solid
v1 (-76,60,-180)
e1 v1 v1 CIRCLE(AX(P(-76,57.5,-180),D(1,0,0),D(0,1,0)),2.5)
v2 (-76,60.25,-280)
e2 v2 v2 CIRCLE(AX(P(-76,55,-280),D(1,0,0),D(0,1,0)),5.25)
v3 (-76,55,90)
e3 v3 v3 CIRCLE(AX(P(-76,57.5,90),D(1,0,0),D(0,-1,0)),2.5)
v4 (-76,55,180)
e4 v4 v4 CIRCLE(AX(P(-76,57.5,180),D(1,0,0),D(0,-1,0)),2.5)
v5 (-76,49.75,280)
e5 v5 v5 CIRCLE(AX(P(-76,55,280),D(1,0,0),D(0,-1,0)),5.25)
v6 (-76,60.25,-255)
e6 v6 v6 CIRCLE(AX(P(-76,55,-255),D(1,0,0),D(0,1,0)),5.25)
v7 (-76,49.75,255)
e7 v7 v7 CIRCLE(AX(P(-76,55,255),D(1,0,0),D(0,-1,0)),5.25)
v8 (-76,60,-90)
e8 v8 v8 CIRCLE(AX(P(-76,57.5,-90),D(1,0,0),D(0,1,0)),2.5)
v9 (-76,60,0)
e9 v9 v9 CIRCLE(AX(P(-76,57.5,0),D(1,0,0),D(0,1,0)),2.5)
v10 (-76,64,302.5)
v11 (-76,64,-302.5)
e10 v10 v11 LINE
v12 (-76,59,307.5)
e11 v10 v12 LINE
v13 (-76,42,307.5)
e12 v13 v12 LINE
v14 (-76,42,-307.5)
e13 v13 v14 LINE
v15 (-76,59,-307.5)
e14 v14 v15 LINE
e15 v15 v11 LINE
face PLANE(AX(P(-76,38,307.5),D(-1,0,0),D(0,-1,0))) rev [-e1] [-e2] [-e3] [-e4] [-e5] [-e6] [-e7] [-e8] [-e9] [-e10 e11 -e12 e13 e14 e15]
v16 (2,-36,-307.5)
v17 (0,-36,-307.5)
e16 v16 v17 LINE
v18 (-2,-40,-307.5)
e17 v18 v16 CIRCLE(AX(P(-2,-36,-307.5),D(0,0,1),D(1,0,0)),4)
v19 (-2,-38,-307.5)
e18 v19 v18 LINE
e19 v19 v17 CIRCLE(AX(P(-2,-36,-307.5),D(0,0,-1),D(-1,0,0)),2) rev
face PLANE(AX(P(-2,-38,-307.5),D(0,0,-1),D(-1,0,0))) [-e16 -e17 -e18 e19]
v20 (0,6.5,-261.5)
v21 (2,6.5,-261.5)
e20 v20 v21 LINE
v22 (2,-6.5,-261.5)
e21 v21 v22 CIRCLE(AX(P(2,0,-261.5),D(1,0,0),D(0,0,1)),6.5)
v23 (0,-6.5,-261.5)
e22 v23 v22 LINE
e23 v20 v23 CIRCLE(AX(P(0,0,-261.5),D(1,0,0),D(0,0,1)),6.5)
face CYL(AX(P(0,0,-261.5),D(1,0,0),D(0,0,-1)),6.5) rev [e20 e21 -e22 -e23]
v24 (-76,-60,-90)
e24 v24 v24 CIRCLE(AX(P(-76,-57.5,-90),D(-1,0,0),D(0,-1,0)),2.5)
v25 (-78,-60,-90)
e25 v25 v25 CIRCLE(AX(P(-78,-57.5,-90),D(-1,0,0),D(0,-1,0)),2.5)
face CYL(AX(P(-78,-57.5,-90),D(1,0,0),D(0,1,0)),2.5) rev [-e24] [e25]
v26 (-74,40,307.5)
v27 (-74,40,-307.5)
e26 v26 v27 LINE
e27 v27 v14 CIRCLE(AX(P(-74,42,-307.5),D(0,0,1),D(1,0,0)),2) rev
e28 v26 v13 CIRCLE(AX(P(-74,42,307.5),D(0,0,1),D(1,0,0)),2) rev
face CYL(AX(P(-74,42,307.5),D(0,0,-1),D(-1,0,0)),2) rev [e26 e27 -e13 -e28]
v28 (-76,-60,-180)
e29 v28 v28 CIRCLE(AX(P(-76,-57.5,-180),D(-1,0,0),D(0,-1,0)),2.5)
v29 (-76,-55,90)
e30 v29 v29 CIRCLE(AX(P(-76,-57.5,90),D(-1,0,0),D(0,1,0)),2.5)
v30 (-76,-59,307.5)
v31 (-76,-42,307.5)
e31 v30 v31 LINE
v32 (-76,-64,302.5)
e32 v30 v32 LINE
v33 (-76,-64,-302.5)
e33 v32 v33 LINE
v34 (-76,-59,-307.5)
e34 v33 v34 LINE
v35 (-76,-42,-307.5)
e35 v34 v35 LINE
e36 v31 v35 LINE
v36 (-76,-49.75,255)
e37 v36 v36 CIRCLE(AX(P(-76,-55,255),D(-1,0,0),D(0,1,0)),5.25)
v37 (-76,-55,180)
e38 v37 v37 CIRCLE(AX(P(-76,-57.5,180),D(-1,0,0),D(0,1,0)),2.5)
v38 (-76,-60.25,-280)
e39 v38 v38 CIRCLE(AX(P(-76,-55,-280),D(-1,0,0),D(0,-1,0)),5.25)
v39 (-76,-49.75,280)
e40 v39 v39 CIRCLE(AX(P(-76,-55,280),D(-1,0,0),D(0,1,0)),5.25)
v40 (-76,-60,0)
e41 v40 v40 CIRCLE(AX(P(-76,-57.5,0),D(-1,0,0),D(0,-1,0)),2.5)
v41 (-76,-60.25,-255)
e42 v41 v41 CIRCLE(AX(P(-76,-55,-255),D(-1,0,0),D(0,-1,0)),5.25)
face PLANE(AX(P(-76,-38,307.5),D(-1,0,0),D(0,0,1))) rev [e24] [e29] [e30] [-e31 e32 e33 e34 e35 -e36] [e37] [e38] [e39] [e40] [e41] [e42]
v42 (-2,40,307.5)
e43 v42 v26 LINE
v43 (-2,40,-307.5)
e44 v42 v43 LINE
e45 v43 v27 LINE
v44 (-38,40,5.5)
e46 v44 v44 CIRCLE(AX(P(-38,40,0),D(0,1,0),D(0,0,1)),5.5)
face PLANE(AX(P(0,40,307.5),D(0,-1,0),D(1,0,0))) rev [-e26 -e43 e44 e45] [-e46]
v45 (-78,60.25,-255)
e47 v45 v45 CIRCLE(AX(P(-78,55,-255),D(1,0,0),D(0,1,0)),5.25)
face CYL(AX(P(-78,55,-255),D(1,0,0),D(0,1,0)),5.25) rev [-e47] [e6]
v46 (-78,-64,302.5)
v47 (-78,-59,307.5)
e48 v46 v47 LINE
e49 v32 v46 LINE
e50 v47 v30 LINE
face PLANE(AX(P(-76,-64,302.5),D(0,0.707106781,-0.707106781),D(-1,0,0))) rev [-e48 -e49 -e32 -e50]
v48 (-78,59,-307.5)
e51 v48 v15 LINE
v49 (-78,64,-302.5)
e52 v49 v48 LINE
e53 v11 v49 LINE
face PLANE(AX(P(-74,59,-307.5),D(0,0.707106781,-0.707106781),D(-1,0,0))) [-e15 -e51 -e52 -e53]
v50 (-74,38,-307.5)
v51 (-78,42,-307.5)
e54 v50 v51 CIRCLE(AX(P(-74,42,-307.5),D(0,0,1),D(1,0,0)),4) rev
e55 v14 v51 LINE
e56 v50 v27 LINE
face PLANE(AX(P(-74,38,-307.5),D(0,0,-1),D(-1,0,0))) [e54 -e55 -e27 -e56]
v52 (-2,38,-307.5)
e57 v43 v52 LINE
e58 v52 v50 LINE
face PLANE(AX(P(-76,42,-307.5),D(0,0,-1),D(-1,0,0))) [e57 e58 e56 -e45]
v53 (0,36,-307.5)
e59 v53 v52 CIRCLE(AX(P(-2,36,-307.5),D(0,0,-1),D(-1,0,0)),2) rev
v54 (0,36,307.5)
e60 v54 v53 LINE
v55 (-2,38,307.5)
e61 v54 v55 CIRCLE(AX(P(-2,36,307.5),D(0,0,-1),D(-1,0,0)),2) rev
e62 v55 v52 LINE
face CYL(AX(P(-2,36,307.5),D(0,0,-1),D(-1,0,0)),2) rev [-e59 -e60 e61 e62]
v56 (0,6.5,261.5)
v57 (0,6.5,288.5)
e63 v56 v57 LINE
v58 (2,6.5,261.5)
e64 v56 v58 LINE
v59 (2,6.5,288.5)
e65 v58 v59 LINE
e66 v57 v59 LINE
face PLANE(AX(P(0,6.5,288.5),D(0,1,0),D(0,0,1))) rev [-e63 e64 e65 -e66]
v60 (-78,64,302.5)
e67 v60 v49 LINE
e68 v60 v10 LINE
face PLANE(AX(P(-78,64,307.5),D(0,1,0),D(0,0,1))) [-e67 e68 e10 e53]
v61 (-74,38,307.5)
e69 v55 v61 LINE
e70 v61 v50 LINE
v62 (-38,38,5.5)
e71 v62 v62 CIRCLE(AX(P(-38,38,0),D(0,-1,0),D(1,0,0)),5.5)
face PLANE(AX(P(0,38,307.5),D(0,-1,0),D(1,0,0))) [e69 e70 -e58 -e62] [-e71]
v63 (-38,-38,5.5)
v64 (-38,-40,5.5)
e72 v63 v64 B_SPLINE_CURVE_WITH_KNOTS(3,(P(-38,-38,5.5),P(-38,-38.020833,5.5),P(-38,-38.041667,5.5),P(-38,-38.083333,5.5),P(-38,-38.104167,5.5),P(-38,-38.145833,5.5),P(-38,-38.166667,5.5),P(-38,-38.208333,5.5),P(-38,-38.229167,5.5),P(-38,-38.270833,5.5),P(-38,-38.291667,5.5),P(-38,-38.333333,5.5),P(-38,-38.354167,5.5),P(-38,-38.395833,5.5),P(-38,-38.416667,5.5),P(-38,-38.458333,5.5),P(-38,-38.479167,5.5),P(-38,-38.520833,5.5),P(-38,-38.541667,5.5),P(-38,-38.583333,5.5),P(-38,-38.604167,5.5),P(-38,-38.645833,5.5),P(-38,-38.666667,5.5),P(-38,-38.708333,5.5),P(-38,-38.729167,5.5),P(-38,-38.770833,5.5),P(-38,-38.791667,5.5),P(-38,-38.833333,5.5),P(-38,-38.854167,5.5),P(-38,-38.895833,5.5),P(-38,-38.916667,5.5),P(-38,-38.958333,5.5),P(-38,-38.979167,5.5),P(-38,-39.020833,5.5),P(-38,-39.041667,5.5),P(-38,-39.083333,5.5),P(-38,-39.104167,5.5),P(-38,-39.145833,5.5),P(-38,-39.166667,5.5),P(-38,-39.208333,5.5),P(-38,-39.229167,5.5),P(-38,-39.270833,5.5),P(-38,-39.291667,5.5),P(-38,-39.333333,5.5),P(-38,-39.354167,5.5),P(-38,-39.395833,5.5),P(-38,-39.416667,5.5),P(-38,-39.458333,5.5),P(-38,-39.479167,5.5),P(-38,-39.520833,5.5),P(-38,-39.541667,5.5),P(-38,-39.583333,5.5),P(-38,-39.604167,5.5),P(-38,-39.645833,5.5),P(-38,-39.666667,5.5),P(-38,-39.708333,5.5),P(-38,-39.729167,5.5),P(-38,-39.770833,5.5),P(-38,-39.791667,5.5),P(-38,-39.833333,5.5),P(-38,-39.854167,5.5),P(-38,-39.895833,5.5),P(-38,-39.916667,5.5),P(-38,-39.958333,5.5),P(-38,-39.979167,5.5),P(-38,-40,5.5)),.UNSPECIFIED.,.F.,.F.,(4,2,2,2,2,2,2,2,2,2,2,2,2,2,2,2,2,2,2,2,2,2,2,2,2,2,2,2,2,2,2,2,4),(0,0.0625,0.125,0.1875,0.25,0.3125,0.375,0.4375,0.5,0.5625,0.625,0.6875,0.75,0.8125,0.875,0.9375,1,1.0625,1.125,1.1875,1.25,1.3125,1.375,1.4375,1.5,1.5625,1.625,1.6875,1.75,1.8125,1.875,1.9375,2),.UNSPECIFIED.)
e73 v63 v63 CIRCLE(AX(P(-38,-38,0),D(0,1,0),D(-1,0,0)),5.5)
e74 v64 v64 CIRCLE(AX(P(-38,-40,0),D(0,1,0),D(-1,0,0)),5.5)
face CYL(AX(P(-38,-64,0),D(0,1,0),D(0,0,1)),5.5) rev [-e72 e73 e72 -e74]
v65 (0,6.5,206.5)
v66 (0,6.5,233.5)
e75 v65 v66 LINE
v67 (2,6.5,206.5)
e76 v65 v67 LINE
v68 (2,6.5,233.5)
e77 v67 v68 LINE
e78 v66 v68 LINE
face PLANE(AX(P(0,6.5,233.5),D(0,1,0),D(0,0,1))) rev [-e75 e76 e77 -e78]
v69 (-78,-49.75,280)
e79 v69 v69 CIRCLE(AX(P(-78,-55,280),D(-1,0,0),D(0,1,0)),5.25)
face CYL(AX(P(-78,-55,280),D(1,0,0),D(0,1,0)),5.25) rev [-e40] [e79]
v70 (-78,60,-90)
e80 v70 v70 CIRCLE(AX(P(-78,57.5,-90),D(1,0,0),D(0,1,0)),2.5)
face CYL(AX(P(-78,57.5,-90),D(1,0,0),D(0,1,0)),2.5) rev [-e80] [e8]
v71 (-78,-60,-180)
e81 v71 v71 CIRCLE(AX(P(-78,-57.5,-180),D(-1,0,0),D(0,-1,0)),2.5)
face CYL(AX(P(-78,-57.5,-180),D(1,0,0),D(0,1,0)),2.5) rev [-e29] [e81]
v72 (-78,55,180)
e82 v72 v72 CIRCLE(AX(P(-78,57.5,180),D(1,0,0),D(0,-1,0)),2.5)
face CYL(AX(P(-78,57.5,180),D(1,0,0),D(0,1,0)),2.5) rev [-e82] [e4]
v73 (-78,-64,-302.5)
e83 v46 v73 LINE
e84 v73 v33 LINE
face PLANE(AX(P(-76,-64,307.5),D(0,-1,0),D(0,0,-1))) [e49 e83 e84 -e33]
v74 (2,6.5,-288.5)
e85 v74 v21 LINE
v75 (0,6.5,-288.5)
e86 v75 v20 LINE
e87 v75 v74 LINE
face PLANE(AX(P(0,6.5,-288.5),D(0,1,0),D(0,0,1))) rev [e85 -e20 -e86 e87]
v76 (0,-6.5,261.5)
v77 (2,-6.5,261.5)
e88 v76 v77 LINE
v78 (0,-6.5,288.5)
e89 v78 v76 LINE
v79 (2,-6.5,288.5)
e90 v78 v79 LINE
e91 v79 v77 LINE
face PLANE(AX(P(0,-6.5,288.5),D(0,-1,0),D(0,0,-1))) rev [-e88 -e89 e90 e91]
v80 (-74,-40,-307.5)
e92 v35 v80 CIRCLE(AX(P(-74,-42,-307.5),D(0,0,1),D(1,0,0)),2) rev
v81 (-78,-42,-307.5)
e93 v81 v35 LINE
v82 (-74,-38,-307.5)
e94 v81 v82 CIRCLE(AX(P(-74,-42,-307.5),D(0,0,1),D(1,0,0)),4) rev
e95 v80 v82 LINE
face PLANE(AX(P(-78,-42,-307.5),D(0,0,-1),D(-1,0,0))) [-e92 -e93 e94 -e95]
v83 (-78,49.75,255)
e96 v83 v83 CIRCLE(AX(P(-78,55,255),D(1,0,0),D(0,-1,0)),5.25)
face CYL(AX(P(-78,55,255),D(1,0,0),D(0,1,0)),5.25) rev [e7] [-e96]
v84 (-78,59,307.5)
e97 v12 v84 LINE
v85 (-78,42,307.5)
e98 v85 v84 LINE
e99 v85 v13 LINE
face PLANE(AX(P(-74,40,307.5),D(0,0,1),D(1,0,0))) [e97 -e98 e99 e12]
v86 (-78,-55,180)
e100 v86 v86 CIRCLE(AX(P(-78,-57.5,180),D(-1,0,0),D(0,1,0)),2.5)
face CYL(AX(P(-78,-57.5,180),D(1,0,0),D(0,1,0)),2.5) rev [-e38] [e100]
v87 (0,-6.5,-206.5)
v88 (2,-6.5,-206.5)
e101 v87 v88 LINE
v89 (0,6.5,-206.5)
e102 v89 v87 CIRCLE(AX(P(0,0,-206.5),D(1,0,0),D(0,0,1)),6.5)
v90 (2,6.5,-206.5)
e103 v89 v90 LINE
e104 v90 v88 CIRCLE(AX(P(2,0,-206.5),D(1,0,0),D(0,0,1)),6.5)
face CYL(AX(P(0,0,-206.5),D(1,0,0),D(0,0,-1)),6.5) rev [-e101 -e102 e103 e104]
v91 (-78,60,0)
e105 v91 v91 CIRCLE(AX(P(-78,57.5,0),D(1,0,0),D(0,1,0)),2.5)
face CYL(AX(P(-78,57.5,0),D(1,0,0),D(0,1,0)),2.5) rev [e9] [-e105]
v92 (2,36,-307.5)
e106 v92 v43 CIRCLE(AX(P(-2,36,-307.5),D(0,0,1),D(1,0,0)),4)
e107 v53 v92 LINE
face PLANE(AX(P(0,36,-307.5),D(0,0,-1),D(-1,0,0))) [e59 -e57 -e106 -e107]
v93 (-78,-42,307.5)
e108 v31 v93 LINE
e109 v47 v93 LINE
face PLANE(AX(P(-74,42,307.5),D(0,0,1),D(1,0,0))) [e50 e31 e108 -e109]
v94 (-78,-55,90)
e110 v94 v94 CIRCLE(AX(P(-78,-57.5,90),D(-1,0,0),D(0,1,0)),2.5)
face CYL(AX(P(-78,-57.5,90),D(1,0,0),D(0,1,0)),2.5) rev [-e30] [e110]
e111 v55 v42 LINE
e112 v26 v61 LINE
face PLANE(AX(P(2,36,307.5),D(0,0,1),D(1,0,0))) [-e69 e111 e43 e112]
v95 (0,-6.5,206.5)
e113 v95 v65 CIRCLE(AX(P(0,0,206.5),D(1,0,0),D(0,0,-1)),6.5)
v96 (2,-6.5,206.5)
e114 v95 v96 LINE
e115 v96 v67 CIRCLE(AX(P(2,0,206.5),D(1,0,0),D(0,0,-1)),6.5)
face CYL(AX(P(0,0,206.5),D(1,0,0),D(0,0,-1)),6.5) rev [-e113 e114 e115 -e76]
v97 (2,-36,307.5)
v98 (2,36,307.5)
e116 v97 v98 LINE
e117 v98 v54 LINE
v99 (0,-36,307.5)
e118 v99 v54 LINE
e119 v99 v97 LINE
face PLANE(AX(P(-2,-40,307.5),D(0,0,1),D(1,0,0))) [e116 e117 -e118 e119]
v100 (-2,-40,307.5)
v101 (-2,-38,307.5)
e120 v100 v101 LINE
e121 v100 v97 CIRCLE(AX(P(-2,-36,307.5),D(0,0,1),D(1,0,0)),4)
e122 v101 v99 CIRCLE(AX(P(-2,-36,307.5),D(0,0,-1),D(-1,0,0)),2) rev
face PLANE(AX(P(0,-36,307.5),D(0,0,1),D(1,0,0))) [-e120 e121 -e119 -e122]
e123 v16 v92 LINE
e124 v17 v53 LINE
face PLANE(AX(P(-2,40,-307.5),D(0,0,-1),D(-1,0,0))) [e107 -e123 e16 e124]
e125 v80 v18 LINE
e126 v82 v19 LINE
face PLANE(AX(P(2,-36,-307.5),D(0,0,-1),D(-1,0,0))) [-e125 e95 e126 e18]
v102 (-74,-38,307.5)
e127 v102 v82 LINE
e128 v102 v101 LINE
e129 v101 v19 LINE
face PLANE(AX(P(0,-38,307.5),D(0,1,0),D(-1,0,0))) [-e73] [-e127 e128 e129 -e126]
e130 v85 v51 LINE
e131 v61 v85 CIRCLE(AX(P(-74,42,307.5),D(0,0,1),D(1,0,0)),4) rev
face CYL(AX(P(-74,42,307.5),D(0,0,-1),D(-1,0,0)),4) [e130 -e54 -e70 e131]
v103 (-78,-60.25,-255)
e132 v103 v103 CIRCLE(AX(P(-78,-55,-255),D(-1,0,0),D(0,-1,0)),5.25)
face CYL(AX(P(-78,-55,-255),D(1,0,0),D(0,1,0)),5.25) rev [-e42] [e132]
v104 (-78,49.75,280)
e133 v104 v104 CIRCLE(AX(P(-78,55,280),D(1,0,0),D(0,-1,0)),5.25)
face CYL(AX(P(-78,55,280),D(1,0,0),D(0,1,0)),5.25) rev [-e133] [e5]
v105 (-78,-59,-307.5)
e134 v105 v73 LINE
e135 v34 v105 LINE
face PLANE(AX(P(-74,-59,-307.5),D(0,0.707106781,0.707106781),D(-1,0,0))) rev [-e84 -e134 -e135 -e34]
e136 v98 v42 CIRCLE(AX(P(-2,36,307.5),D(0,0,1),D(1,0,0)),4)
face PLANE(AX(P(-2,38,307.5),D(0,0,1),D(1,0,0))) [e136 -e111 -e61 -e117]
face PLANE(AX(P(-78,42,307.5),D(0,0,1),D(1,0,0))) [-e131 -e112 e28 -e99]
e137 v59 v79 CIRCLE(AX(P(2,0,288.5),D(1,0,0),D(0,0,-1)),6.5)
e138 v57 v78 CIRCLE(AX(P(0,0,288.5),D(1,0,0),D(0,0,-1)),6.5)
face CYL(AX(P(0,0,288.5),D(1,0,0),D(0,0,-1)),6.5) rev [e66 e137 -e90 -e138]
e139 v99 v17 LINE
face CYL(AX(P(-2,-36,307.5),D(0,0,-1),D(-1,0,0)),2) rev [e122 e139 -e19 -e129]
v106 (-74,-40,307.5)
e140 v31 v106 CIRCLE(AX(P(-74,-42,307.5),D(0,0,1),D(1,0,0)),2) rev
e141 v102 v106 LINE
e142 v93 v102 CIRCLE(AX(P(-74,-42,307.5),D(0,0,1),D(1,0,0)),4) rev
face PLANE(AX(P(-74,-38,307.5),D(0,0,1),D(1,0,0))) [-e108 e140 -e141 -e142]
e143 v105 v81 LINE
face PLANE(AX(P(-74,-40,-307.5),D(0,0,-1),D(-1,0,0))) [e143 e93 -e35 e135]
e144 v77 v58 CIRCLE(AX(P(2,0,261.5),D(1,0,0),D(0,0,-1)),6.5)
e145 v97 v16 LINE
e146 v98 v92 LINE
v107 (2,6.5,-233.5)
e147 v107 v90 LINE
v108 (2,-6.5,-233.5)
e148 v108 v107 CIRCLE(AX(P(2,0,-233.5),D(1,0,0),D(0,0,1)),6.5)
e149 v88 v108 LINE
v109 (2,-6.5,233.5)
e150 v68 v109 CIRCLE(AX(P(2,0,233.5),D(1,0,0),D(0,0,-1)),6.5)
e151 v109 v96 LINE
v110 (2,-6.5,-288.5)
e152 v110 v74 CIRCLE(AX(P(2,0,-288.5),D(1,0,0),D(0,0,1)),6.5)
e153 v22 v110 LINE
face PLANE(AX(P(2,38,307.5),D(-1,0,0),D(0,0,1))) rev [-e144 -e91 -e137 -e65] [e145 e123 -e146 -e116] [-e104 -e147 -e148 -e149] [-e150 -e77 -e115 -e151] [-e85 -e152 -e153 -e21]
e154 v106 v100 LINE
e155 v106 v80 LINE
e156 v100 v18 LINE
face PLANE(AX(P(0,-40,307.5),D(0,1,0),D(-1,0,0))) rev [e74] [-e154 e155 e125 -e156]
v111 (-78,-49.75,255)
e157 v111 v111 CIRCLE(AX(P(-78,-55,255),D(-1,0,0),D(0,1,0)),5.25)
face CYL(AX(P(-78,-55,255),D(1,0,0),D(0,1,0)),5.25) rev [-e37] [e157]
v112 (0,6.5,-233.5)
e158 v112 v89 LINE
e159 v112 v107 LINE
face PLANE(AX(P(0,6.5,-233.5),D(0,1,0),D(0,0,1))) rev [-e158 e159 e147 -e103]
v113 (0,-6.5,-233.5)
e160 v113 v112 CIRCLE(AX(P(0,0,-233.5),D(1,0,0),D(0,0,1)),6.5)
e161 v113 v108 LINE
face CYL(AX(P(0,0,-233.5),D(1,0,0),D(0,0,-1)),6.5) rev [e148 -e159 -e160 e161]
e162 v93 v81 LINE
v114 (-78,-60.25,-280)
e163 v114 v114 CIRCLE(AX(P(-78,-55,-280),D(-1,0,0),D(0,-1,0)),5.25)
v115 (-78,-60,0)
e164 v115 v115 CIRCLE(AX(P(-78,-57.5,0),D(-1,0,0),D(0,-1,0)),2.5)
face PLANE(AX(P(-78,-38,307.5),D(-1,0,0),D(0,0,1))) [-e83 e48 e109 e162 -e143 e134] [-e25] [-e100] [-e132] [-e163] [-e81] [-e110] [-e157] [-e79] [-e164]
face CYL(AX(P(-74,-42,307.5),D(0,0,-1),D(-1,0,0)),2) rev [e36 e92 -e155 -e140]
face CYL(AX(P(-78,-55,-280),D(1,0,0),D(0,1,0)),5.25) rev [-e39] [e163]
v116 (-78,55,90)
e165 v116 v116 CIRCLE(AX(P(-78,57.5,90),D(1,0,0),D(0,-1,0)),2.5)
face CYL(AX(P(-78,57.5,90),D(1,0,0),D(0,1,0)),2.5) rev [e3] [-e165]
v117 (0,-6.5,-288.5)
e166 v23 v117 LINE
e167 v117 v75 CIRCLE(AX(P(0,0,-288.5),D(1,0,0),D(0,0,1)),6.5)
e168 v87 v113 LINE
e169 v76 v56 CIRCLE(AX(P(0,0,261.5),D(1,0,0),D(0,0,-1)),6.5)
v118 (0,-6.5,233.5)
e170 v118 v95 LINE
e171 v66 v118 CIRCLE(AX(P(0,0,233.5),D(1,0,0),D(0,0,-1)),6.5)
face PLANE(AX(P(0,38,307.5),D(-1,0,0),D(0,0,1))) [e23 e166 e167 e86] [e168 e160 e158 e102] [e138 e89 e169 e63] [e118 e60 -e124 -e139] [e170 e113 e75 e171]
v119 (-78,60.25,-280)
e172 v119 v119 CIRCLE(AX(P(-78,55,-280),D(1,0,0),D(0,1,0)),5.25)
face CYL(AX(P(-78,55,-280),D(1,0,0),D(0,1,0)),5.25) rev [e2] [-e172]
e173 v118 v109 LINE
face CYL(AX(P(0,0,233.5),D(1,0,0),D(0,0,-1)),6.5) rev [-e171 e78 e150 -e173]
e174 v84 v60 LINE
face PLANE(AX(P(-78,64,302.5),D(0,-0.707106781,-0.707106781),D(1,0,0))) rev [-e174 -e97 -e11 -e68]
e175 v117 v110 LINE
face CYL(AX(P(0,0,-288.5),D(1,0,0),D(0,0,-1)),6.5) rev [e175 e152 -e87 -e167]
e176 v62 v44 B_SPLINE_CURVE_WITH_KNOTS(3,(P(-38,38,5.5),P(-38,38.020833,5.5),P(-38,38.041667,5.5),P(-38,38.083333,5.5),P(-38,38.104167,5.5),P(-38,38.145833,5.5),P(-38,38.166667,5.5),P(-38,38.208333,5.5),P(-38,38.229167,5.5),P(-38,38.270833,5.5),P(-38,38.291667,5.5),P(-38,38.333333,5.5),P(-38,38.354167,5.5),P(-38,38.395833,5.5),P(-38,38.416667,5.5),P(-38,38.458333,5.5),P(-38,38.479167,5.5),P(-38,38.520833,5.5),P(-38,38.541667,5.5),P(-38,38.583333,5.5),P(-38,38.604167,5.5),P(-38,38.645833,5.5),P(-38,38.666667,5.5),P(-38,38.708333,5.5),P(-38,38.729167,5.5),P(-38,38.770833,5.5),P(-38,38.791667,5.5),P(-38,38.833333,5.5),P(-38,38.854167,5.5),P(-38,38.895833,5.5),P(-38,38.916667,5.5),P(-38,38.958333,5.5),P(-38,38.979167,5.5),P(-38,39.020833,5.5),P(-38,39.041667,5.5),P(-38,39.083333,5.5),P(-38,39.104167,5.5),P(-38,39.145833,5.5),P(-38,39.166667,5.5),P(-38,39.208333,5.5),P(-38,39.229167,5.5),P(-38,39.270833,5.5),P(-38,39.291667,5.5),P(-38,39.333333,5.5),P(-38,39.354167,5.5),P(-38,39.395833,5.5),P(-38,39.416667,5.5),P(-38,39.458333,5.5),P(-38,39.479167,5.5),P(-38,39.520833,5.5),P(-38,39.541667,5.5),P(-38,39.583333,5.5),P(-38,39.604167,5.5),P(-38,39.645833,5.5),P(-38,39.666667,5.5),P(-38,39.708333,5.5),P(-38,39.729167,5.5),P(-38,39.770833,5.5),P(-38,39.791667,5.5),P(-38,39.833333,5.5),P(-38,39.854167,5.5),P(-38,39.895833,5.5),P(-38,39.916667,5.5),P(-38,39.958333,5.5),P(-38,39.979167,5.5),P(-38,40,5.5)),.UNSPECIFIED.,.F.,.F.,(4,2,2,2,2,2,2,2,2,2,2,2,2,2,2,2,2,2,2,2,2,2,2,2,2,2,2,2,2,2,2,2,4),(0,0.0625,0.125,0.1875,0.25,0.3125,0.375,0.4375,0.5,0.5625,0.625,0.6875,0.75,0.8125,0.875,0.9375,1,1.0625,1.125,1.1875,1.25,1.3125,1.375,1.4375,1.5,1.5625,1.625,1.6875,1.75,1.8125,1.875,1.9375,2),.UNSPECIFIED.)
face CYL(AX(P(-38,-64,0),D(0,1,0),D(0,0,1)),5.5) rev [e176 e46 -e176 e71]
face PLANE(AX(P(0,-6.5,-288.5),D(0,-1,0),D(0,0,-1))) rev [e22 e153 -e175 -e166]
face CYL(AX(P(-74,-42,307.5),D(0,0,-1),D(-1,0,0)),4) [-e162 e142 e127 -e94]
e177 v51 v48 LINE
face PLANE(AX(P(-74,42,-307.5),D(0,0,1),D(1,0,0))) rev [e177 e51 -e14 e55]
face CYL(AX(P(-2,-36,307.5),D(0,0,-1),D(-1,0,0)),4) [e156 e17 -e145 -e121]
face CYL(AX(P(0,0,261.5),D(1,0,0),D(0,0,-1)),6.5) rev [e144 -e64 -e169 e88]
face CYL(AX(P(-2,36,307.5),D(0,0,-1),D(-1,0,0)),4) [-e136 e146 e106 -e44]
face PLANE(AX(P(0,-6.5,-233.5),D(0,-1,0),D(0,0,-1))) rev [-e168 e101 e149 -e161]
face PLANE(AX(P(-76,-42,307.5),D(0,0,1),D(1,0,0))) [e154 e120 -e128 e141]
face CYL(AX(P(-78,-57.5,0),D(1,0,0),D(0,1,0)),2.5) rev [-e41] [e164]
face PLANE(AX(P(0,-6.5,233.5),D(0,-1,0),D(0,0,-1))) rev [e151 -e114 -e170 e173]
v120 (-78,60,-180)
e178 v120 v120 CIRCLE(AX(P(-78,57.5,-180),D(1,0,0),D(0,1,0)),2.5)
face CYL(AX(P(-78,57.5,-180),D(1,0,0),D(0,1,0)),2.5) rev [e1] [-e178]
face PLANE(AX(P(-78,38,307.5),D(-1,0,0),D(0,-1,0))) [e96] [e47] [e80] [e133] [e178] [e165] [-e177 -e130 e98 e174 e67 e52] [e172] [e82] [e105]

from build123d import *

# Parameters (mm, degrees)
SM_BASE_FLANGE_1_DEPTH = 307.5
SKETCH_6_R             = 5.25
SKETCH_6_R_2           = 2.5
CUT_EXTRUDE_1_DEPTH    = 10
CUT_EXTRUDE_2_DEPTH    = 10
SKETCH_9_R             = 5.5
CUT_EXTRUDE_4_DEPTH    = 334.850640257
CHAMFER_1_SIZE         = 5


# Sheet-metal steps are written as plain solids
with BuildPart() as part:
    # Sketch 1 → Базовая кромка1 (new, symmetric)
    with BuildSketch(Plane.XY):
        with BuildLine():
            Line((-78, 64), (-78, 42))
            ThreePointArc((-78, 42), (-76.828427125, 39.171572875), (-74, 38))
            Line((-74, 38), (-2, 38))
            ThreePointArc((-2, 38), (-0.585786438, 37.414213562), (0, 36))
            Line((0, 36), (0, -36))
            ThreePointArc((0, -36), (-0.585786438, -37.414213562), (-2, -38))
            Line((-2, -38), (-74, -38))
            ThreePointArc((-74, -38), (-76.828427125, -39.171572875), (-78, -42))
            Line((-78, -42), (-78, -64))
            Line((-78, -64), (-76, -64))
            Line((-76, -64), (-76, -42))
            ThreePointArc((-76, -42), (-75.414213562, -40.585786438), (-74, -40))
            Line((-74, -40), (-2, -40))
            ThreePointArc((-2, -40), (0.828427125, -38.828427125), (2, -36))
            Line((2, -36), (2, 36))
            ThreePointArc((2, 36), (0.828427125, 38.828427125), (-2, 40))
            Line((-2, 40), (-74, 40))
            ThreePointArc((-74, 40), (-75.414213562, 40.585786438), (-76, 42))
            Line((-76, 42), (-76, 64))
            Line((-76, 64), (-78, 64))
        make_face()
    extrude(amount=SM_BASE_FLANGE_1_DEPTH, both=True)

    # Эскиз6 → Вырез-Вытянуть1 (cut)
    with BuildSketch(Plane(origin=(-76, 0, 0), x_dir=(0, 0, -1), z_dir=(1, 0, 0))):
        with Locations(Location((280, 55, 0), (0, 0, 90))):
            Circle(SKETCH_6_R)
        with Locations(Location((255, 55, 0), (0, 0, 90))):
            Circle(SKETCH_6_R)
        with Locations(Location((180, 57.5, 0), (0, 0, 90))):
            Circle(SKETCH_6_R_2)
        with Locations(Location((90, 57.5, 0), (0, 0, 90))):
            Circle(SKETCH_6_R_2)
        with Locations(Location((0, 57.5, 0), (0, 0, 90))):
            Circle(SKETCH_6_R_2)
        with Locations(Location((-90, 57.5, 0), (0, 0, 270))):
            Circle(SKETCH_6_R_2)
        with Locations(Location((-180, 57.5, 0), (0, 0, 270))):
            Circle(SKETCH_6_R_2)
        with Locations(Location((-255, 55, 0), (0, 0, 270))):
            Circle(SKETCH_6_R)
        with Locations(Location((-280, 55, 0), (0, 0, 270))):
            Circle(SKETCH_6_R)
    cut_extrude_1 = extrude(amount=-CUT_EXTRUDE_1_DEPTH, mode=Mode.SUBTRACT)

    # Зеркальное отражение1: Вырез-Вытянуть1 across plane
    add(cut_extrude_1.mirror(Plane.ZX), mode=Mode.SUBTRACT)

    # Эскиз7 → Вырез-Вытянуть2 (cut)
    with BuildSketch(Plane(origin=(2, 0, 0), x_dir=(0, 0, -1), z_dir=(1, 0, 0))):
        with BuildLine():
            Line((-288.5, 6.5), (-261.5, 6.5))
            ThreePointArc((-261.5, 6.5), (-255, 0), (-261.5, -6.5))
            Line((-261.5, -6.5), (-288.5, -6.5))
            ThreePointArc((-288.5, -6.5), (-295, 0), (-288.5, 6.5))
        make_face()
        with BuildLine():
            Line((-233.5, 6.5), (-206.5, 6.5))
            ThreePointArc((-206.5, 6.5), (-200, 0), (-206.5, -6.5))
            Line((-206.5, -6.5), (-233.5, -6.5))
            ThreePointArc((-233.5, -6.5), (-240, 0), (-233.5, 6.5))
        make_face()
        with BuildLine():
            Line((288.5, 6.5), (261.5, 6.5))
            ThreePointArc((261.5, 6.5), (255, 0), (261.5, -6.5))
            Line((261.5, -6.5), (288.5, -6.5))
            ThreePointArc((288.5, -6.5), (295, 0), (288.5, 6.5))
        make_face()
        with BuildLine():
            Line((233.5, 6.5), (206.5, 6.5))
            ThreePointArc((206.5, 6.5), (200, 0), (206.5, -6.5))
            Line((206.5, -6.5), (233.5, -6.5))
            ThreePointArc((233.5, -6.5), (240, 0), (233.5, 6.5))
        make_face()
    extrude(amount=-CUT_EXTRUDE_2_DEPTH, mode=Mode.SUBTRACT)

    # Эскиз9 → Вырез-Вытянуть4 (cut, through all)
    with BuildSketch(Plane(origin=(0, 40, 0), x_dir=(1, 0, 0), z_dir=(0, 1, 0))):
        with Locations(Location((-38, 0, 0), (0, 0, 270))):
            Circle(SKETCH_9_R)
    extrude(amount=-CUT_EXTRUDE_4_DEPTH, mode=Mode.SUBTRACT)

    # Фаска1
    chamfer_1_edges = [part.edges().sort_by_distance(p)[0] for p in [
        (-77, -64, -307.5),
        (-77, 64, -307.5),
        (-77, -64, 307.5),
        (-77, 64, 307.5),
    ]]
    chamfer(chamfer_1_edges, length=CHAMFER_1_SIZE)


solid = part.part
